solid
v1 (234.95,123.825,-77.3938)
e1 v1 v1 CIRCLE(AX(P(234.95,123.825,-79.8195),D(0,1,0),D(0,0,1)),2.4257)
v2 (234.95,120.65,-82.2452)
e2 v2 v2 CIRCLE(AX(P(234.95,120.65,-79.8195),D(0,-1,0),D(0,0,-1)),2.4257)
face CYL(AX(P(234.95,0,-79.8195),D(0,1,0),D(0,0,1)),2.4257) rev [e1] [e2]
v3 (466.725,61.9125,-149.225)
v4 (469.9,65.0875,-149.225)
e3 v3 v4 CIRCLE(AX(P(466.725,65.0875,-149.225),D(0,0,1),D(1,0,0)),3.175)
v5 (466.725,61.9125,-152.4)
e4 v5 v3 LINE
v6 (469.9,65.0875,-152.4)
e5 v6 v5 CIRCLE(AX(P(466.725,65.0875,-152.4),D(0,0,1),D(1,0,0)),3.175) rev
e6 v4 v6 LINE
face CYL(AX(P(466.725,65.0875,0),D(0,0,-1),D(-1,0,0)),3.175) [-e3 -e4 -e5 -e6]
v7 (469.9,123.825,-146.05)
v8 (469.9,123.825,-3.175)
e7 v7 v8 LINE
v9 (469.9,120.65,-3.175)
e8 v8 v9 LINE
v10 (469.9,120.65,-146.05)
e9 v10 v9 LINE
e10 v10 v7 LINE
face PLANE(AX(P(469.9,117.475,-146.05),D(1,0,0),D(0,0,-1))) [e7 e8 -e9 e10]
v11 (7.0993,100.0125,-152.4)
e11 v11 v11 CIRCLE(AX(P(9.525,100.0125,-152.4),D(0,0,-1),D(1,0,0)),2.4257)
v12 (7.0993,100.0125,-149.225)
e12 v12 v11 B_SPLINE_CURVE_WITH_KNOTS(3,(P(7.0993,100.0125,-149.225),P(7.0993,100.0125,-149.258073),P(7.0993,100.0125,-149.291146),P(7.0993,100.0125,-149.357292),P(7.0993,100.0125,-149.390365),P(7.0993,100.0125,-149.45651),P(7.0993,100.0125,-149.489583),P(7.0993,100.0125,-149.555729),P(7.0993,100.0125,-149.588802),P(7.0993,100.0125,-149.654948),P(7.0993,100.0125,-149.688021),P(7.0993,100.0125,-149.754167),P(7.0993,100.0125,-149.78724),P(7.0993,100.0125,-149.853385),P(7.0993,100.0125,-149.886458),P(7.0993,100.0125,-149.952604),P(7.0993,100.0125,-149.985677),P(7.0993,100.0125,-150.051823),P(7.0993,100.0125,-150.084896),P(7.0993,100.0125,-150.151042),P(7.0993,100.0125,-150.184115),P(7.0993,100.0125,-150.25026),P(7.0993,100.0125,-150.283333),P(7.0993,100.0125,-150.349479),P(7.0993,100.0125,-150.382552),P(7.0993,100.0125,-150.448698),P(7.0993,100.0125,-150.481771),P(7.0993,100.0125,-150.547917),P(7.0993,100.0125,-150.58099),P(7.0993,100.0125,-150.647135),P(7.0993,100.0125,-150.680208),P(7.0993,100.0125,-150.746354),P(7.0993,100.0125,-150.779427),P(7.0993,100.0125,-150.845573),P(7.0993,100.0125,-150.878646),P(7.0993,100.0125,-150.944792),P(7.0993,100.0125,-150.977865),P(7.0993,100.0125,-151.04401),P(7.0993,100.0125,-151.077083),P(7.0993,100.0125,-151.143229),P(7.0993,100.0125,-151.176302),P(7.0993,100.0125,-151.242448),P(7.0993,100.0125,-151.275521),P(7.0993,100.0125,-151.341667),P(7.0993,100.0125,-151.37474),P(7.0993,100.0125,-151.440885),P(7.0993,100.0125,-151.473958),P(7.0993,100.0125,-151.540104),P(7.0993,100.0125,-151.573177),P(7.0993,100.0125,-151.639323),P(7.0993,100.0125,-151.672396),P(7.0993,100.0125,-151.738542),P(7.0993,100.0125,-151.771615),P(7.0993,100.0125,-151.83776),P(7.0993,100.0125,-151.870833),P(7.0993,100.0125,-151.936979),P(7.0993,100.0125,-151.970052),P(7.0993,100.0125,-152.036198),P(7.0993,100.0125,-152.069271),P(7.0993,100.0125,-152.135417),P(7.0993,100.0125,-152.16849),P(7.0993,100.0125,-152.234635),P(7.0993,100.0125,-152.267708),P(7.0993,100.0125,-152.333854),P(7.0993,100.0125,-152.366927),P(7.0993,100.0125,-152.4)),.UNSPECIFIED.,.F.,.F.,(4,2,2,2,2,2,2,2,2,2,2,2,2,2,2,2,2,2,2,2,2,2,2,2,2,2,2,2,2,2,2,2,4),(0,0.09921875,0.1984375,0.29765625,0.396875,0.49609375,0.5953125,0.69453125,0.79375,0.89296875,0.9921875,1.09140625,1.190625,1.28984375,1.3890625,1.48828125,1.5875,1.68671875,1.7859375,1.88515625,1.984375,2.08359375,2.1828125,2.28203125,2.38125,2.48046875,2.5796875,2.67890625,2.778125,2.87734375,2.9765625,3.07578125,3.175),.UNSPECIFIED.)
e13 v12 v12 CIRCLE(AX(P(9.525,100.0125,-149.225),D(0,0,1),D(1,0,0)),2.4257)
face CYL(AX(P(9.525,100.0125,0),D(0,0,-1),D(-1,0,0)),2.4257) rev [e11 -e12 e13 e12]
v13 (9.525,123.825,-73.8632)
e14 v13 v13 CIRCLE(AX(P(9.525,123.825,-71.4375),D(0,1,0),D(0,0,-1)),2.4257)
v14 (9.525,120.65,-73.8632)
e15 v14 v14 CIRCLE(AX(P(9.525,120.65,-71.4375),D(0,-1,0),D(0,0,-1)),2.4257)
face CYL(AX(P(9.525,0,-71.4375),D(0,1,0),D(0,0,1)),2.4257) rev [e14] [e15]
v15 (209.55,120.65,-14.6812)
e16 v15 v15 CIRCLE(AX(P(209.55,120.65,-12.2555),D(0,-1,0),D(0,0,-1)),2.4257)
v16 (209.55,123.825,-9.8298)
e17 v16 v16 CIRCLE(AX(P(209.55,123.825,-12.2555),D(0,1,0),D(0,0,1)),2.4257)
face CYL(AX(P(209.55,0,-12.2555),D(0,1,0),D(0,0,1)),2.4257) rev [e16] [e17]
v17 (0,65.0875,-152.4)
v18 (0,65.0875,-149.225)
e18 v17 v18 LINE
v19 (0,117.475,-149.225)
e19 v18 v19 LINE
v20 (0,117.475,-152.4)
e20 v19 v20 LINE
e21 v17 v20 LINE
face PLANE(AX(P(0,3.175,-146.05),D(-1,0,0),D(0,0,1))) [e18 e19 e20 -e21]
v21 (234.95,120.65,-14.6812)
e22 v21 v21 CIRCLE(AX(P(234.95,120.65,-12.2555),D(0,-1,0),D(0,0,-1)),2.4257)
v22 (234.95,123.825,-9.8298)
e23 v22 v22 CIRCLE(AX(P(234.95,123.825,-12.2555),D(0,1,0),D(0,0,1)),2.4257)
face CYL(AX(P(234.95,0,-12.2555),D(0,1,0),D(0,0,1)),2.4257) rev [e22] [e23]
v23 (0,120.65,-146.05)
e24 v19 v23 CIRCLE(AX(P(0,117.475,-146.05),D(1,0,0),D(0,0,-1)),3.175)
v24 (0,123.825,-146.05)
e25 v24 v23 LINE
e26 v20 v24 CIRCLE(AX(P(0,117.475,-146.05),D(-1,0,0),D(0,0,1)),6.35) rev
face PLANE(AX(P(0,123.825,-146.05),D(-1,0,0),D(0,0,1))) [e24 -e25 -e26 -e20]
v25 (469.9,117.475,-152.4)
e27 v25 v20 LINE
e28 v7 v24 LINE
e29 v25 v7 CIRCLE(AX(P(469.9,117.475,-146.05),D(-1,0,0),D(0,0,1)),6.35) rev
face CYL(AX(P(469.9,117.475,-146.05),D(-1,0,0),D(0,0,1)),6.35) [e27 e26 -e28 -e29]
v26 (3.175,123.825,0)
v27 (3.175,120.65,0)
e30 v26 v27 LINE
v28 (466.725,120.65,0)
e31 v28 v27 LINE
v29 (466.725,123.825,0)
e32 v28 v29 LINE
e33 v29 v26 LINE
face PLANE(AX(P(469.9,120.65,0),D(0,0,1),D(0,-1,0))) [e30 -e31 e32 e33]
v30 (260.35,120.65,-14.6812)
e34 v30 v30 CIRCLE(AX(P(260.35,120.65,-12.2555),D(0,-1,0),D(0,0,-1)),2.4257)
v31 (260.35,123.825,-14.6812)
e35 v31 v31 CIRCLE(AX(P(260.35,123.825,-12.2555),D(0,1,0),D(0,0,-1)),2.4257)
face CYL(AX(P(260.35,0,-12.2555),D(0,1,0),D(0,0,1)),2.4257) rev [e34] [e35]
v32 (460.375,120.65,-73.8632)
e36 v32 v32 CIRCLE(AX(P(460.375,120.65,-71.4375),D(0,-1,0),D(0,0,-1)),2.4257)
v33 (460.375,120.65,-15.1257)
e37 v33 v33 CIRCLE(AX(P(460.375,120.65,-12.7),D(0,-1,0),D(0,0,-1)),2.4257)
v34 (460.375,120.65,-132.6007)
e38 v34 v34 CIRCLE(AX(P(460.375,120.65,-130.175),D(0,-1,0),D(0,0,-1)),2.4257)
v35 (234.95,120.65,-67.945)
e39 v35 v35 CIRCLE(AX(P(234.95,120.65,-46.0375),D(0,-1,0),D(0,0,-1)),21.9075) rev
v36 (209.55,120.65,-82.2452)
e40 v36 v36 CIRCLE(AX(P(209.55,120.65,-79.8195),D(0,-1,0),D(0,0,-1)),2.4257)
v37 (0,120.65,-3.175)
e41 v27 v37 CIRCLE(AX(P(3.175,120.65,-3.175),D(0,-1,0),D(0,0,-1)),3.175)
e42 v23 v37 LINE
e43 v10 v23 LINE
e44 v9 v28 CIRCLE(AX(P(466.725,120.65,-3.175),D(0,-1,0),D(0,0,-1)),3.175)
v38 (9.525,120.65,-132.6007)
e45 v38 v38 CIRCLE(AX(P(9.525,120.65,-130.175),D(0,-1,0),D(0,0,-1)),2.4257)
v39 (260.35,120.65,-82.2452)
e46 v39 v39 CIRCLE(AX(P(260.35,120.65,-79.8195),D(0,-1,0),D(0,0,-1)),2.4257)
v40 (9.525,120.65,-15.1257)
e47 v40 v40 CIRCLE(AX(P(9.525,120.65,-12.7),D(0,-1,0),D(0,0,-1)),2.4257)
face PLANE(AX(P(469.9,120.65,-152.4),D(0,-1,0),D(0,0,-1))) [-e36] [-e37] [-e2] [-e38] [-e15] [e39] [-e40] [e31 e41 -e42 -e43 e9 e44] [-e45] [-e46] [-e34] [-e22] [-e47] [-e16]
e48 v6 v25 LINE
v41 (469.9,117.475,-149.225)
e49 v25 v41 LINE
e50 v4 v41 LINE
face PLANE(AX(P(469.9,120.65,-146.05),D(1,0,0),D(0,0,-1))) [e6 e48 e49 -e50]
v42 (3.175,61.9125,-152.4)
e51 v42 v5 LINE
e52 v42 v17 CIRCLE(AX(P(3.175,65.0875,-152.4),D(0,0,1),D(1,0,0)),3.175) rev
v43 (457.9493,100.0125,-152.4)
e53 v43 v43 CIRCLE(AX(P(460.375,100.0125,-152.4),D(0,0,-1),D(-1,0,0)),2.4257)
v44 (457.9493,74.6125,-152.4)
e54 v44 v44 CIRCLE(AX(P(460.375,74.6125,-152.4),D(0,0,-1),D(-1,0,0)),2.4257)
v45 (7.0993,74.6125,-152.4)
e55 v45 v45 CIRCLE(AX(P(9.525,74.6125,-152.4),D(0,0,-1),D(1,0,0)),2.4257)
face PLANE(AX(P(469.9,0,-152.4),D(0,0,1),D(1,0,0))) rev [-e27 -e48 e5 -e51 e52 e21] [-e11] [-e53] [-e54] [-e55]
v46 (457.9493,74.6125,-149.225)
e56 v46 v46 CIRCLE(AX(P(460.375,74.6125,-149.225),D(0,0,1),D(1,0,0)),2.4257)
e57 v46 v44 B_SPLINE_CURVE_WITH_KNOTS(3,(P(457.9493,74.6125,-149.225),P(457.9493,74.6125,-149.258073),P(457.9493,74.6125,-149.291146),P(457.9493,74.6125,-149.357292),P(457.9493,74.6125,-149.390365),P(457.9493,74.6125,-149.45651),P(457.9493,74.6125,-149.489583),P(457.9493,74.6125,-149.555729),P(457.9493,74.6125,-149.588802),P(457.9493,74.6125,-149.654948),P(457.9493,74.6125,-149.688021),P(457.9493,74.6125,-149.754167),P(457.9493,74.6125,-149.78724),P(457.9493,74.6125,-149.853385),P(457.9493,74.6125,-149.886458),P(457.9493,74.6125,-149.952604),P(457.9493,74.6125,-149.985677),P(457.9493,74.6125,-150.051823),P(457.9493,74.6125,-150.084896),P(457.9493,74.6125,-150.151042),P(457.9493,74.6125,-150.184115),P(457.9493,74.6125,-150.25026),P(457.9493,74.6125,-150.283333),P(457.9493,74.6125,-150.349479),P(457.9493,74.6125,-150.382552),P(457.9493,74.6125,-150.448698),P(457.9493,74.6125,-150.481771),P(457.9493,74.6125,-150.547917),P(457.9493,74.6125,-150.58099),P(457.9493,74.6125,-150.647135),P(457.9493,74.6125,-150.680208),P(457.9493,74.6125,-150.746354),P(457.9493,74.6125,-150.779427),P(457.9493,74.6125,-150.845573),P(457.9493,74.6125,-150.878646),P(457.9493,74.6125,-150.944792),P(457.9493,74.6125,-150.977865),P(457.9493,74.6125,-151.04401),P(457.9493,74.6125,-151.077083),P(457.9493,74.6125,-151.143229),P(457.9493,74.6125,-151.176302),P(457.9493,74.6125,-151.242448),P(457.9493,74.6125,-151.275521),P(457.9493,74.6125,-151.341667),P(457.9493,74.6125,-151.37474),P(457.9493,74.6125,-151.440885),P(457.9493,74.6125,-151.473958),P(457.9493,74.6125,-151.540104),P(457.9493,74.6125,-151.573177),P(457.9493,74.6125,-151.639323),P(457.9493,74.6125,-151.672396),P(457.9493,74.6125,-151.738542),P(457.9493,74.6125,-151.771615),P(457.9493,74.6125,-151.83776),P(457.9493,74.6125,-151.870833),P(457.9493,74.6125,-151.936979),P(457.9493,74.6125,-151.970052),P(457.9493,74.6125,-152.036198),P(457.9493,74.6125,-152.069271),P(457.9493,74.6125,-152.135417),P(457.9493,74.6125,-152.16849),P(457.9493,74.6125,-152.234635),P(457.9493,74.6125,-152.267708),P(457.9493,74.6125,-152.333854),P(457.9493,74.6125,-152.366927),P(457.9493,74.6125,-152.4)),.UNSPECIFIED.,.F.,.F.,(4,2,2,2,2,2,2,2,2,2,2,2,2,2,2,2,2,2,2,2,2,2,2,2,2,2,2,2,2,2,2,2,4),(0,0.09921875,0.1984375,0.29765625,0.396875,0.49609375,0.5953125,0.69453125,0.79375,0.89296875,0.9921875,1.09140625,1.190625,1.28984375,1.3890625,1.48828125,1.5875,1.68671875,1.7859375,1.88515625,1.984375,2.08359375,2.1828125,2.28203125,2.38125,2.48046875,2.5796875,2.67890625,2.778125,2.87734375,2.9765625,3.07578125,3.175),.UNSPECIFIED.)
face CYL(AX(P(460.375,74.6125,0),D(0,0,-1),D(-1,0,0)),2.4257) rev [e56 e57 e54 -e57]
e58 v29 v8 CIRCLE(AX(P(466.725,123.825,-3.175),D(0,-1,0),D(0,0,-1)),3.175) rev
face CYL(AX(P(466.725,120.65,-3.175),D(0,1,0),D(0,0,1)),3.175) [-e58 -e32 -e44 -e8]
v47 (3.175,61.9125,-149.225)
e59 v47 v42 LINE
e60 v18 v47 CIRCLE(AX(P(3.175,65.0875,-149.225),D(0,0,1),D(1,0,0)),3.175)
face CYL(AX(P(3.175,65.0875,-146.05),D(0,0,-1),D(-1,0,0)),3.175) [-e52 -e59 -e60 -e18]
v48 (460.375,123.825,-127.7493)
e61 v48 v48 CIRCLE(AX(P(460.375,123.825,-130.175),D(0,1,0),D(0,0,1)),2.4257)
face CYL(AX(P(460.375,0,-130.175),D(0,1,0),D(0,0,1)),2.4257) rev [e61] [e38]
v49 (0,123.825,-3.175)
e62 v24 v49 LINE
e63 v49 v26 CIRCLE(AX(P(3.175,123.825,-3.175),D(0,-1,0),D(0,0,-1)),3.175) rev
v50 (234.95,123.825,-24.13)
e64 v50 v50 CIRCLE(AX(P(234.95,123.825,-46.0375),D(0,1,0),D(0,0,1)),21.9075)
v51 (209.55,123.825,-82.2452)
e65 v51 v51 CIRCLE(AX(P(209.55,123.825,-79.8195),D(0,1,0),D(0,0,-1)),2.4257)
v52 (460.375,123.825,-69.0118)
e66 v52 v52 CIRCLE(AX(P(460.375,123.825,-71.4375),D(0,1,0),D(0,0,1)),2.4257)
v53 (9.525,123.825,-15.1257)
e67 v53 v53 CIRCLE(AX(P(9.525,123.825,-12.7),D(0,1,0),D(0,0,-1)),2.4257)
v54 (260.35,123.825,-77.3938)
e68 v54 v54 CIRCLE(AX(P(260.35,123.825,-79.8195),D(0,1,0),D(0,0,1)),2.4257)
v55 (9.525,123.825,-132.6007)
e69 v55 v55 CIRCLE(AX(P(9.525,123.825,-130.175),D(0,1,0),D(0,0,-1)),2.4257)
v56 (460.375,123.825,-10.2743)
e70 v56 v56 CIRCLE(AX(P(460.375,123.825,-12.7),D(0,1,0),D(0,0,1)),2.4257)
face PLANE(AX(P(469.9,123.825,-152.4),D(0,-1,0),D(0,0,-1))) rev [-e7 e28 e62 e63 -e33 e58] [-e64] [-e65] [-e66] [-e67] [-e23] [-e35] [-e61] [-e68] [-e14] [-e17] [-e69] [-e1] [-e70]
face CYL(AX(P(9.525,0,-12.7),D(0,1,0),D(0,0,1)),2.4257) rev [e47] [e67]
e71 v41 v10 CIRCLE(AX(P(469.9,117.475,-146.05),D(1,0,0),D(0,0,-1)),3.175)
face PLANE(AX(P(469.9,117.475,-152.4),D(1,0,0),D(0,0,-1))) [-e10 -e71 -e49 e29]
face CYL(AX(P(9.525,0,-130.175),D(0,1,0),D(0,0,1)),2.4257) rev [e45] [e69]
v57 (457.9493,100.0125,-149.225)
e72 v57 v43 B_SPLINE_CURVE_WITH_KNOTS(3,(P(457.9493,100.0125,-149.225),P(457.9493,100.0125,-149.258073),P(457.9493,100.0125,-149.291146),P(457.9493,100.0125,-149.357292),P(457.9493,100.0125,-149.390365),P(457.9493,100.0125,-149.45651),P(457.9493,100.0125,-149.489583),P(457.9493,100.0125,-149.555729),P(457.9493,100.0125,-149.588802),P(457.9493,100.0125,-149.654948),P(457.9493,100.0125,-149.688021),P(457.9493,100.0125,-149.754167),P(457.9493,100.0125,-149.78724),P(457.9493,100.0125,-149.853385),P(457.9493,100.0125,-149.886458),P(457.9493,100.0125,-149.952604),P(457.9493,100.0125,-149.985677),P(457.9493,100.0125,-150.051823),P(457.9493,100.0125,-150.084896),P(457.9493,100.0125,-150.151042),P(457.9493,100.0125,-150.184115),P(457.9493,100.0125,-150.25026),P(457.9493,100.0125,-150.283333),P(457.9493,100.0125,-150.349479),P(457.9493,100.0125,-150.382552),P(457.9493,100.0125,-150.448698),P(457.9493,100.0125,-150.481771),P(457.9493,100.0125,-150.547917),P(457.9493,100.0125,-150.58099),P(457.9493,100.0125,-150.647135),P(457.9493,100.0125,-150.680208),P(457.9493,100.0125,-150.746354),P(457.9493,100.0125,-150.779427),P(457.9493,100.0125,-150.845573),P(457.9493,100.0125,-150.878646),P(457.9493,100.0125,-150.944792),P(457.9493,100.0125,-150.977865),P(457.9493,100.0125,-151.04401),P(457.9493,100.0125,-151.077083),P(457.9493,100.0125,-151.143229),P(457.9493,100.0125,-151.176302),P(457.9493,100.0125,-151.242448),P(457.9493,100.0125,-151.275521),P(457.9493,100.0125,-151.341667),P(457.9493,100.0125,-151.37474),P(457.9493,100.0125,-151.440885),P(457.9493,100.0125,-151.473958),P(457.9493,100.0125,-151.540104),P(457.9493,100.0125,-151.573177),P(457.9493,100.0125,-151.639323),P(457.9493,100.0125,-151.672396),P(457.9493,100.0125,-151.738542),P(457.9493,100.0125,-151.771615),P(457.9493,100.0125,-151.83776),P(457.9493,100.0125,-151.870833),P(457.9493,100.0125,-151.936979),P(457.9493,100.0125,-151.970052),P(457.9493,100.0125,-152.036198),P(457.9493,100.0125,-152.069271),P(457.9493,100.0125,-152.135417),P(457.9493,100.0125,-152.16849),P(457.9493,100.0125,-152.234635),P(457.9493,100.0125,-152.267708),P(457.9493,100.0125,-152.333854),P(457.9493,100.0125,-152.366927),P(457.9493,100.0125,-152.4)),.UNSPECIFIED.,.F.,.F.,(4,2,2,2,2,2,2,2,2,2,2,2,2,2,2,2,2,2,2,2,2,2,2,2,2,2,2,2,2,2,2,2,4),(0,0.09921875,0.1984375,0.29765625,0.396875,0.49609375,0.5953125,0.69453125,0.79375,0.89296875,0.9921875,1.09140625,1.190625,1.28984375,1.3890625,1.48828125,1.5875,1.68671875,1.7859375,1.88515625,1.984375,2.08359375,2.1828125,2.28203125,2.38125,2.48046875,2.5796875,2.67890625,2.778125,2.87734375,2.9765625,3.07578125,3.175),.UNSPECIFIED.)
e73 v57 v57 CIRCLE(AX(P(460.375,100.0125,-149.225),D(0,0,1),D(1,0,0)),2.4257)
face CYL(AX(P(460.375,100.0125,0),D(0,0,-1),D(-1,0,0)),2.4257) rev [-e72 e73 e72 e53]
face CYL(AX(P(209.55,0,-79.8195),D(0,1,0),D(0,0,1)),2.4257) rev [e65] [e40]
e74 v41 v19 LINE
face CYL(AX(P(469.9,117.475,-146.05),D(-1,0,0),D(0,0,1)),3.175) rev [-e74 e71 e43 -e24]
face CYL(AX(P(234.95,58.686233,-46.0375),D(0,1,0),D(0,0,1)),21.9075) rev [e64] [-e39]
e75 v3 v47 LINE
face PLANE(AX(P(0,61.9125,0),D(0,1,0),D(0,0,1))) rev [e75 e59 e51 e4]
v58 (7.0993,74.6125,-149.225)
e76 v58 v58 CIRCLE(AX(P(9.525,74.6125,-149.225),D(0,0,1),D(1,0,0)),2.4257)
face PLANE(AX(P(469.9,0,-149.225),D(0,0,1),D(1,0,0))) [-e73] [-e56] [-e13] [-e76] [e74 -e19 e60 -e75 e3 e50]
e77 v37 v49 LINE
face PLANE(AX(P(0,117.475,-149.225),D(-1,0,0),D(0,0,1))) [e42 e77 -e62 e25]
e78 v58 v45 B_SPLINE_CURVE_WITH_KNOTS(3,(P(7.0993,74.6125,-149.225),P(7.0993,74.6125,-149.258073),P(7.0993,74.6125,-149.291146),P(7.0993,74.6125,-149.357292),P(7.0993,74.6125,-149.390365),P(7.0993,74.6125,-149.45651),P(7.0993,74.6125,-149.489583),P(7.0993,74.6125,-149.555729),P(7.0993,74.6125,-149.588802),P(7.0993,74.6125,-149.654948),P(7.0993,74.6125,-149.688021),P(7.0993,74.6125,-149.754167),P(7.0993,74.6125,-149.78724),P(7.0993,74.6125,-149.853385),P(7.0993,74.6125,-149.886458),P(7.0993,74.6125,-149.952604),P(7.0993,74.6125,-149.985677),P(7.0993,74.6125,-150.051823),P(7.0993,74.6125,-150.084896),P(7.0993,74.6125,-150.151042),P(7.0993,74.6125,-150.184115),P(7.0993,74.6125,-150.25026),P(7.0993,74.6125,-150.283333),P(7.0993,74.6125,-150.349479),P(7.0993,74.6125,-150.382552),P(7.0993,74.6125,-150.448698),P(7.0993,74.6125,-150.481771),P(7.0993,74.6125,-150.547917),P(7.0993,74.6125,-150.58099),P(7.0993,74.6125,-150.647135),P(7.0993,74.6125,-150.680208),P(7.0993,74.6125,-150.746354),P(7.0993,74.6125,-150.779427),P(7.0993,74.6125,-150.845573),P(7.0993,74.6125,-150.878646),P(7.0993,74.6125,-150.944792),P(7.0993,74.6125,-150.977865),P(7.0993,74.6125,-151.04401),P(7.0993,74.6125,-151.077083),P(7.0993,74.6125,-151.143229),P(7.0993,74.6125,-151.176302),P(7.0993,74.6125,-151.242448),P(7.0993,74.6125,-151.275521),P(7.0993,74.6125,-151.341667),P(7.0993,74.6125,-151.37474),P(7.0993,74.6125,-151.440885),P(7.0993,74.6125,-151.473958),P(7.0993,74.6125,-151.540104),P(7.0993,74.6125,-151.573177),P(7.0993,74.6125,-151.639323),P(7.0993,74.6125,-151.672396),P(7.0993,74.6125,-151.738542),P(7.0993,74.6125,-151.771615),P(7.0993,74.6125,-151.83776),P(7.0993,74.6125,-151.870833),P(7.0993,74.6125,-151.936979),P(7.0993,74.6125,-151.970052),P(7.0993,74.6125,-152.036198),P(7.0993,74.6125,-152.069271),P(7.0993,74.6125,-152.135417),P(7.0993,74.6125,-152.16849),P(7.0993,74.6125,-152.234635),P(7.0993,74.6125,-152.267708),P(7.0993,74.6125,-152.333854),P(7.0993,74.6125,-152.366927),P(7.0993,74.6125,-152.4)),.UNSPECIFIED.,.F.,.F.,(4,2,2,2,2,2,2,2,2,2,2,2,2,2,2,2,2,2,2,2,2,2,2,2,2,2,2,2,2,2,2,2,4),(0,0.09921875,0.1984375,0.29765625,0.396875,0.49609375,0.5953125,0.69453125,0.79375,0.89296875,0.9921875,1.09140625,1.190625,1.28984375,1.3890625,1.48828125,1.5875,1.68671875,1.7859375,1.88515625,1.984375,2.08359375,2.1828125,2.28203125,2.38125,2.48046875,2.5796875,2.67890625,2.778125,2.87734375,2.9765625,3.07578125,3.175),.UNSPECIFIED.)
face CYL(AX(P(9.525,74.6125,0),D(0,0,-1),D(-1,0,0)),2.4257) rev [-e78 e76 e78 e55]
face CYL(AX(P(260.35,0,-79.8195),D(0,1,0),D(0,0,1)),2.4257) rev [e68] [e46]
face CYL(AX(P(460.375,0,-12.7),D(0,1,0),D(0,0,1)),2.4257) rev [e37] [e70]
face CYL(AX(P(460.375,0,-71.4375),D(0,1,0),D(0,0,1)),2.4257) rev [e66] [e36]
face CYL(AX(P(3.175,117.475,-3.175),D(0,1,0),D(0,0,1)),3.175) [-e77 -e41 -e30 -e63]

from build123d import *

# Parameters (mm, degrees)
BASE_FLANGE1_DEPTH = 469.9
SKETCH6_R          = 21.9075
CUT_EXTRUDE1_DEPTH = 3.175
SKETCH7_R          = 2.4257
CUT_EXTRUDE2_DEPTH = 510.278313523
SKETCH8_R          = 2.4257
CUT_EXTRUDE3_DEPTH = 510.278313523
SKETCH9_R          = 2.4257
CUT_EXTRUDE4_DEPTH = 510.278313523
FILLET1_R          = 3.175
SKETCH10_W         = 152.4
SKETCH10_H         = 61.9125
CUT_EXTRUDE5_DEPTH = 510.278313523
FILLET2_R          = 3.175


# Sheet-metal steps are written as plain solids
with BuildPart() as part:
    # Sketch1 → Base-Flange1 (new body)
    with BuildSketch(Plane(origin=(0, 0, 0), x_dir=(0, 0, -1), z_dir=(1, 0, 0))):
        with BuildLine():
            Line((0, 0), (146.05, 0))
            ThreePointArc((146.05, 0), (150.540128061, 1.859871939), (152.4, 6.35))
            Line((152.4, 6.35), (152.4, 117.475))
            ThreePointArc((152.4, 117.475), (150.540128061, 121.965128061), (146.05, 123.825))
            Line((146.05, 123.825), (0, 123.825))
            Line((0, 123.825), (0, 120.65))
            Line((0, 120.65), (146.05, 120.65))
            ThreePointArc((146.05, 120.65), (148.29506403, 119.72006403), (149.225, 117.475))
            Line((149.225, 117.475), (149.225, 6.35))
            ThreePointArc((149.225, 6.35), (148.29506403, 4.10493597), (146.05, 3.175))
            Line((146.05, 3.175), (0, 3.175))
            Line((0, 3.175), (0, 0))
        make_face()
    extrude(amount=BASE_FLANGE1_DEPTH)

    # Sketch6 → Cut-Extrude1 (cut)
    with BuildSketch(Plane(origin=(0, 123.825, 0), x_dir=(1, 0, 0), z_dir=(0, 1, 0))):
        with Locations(Location((234.95, 46.0375, 0), (0, 0, 270))):
            Circle(SKETCH6_R)
    extrude(amount=-CUT_EXTRUDE1_DEPTH, mode=Mode.SUBTRACT)

    # Sketch7 → Cut-Extrude2 (cut, through all)
    with BuildSketch(Plane(origin=(0, 123.825, 0), x_dir=(1, 0, 0), z_dir=(0, 1, 0))):
        with Locations(Location((234.95, 12.2555, 0), (0, 0, 270))):
            Circle(SKETCH7_R)
        with Locations(Location((234.95, 79.8195, 0), (0, 0, 270))):
            Circle(SKETCH7_R)
        with Locations(Location((209.55, 12.2555, 0), (0, 0, 270))):
            Circle(SKETCH7_R)
        with Locations(Location((260.35, 12.2555, 0), (0, 0, 270))):
            Circle(SKETCH7_R)
        with Locations(Location((260.35, 79.8195, 0), (0, 0, 270))):
            Circle(SKETCH7_R)
        with Locations(Location((209.55, 79.8195, 0), (0, 0, 270))):
            Circle(SKETCH7_R)
    extrude(amount=-CUT_EXTRUDE2_DEPTH, mode=Mode.SUBTRACT)

    # Sketch8 → Cut-Extrude3 (cut, through all)
    with BuildSketch(Plane(origin=(0, 123.825, 0), x_dir=(1, 0, 0), z_dir=(0, 1, 0))):
        with Locations(Location((460.375, 12.7, 0), (0, 0, 270))):
            Circle(SKETCH8_R)
        with Locations(Location((460.375, 71.4375, 0), (0, 0, 270))):
            Circle(SKETCH8_R)
        with Locations(Location((460.375, 130.175, 0), (0, 0, 270))):
            Circle(SKETCH8_R)
        with Locations(Location((9.525, 130.175, 0), (0, 0, 270))):
            Circle(SKETCH8_R)
        with Locations(Location((9.525, 71.4375, 0), (0, 0, 270))):
            Circle(SKETCH8_R)
        with Locations(Location((9.525, 12.7, 0), (0, 0, 270))):
            Circle(SKETCH8_R)
    extrude(amount=-CUT_EXTRUDE3_DEPTH, mode=Mode.SUBTRACT)

    # Sketch9 → Cut-Extrude4 (cut, through all)
    with BuildSketch(Plane(origin=(0, 0, -152.4), x_dir=(-1, 0, 0), z_dir=(0, 0, -1))):
        with Locations((-460.375, 74.6125)):
            Circle(SKETCH9_R)
        with Locations((-460.375, 49.2125)):
            Circle(SKETCH9_R)
        with Locations((-9.525, 49.2125)):
            Circle(SKETCH9_R)
        with Locations((-9.525, 74.6125)):
            Circle(SKETCH9_R)
        with Locations((-460.375, 100.0125)):
            Circle(SKETCH9_R)
        with Locations((-460.375, 23.8125)):
            Circle(SKETCH9_R)
        with Locations((-9.525, 23.8125)):
            Circle(SKETCH9_R)
        with Locations((-9.525, 100.0125)):
            Circle(SKETCH9_R)
    extrude(amount=-CUT_EXTRUDE4_DEPTH, mode=Mode.SUBTRACT)

    # Fillet1
    fillet1_edges = [part.edges().sort_by_distance(p)[0] for p in [
        (0, 1.5875, 0),
        (0, 122.2375, 0),
        (469.9, 1.5875, 0),
        (469.9, 122.2375, 0),
    ]]
    fillet(fillet1_edges, radius=FILLET1_R)

    # Sketch10 → Cut-Extrude5 (cut, through all)
    with BuildSketch(Plane(origin=(469.9, 0, 0), x_dir=(0, 0, -1), z_dir=(1, 0, 0))):
        with Locations((76.2, 30.95625)):
            Rectangle(SKETCH10_W, SKETCH10_H)
    extrude(amount=-CUT_EXTRUDE5_DEPTH, mode=Mode.SUBTRACT)

    # Fillet2
    fillet2_edges = [part.edges().sort_by_distance(p)[0] for p in [
        (469.9, 61.9125, -150.8125),
        (0, 61.9125, -150.8125),
    ]]
    fillet(fillet2_edges, radius=FILLET2_R)


solid = part.part
